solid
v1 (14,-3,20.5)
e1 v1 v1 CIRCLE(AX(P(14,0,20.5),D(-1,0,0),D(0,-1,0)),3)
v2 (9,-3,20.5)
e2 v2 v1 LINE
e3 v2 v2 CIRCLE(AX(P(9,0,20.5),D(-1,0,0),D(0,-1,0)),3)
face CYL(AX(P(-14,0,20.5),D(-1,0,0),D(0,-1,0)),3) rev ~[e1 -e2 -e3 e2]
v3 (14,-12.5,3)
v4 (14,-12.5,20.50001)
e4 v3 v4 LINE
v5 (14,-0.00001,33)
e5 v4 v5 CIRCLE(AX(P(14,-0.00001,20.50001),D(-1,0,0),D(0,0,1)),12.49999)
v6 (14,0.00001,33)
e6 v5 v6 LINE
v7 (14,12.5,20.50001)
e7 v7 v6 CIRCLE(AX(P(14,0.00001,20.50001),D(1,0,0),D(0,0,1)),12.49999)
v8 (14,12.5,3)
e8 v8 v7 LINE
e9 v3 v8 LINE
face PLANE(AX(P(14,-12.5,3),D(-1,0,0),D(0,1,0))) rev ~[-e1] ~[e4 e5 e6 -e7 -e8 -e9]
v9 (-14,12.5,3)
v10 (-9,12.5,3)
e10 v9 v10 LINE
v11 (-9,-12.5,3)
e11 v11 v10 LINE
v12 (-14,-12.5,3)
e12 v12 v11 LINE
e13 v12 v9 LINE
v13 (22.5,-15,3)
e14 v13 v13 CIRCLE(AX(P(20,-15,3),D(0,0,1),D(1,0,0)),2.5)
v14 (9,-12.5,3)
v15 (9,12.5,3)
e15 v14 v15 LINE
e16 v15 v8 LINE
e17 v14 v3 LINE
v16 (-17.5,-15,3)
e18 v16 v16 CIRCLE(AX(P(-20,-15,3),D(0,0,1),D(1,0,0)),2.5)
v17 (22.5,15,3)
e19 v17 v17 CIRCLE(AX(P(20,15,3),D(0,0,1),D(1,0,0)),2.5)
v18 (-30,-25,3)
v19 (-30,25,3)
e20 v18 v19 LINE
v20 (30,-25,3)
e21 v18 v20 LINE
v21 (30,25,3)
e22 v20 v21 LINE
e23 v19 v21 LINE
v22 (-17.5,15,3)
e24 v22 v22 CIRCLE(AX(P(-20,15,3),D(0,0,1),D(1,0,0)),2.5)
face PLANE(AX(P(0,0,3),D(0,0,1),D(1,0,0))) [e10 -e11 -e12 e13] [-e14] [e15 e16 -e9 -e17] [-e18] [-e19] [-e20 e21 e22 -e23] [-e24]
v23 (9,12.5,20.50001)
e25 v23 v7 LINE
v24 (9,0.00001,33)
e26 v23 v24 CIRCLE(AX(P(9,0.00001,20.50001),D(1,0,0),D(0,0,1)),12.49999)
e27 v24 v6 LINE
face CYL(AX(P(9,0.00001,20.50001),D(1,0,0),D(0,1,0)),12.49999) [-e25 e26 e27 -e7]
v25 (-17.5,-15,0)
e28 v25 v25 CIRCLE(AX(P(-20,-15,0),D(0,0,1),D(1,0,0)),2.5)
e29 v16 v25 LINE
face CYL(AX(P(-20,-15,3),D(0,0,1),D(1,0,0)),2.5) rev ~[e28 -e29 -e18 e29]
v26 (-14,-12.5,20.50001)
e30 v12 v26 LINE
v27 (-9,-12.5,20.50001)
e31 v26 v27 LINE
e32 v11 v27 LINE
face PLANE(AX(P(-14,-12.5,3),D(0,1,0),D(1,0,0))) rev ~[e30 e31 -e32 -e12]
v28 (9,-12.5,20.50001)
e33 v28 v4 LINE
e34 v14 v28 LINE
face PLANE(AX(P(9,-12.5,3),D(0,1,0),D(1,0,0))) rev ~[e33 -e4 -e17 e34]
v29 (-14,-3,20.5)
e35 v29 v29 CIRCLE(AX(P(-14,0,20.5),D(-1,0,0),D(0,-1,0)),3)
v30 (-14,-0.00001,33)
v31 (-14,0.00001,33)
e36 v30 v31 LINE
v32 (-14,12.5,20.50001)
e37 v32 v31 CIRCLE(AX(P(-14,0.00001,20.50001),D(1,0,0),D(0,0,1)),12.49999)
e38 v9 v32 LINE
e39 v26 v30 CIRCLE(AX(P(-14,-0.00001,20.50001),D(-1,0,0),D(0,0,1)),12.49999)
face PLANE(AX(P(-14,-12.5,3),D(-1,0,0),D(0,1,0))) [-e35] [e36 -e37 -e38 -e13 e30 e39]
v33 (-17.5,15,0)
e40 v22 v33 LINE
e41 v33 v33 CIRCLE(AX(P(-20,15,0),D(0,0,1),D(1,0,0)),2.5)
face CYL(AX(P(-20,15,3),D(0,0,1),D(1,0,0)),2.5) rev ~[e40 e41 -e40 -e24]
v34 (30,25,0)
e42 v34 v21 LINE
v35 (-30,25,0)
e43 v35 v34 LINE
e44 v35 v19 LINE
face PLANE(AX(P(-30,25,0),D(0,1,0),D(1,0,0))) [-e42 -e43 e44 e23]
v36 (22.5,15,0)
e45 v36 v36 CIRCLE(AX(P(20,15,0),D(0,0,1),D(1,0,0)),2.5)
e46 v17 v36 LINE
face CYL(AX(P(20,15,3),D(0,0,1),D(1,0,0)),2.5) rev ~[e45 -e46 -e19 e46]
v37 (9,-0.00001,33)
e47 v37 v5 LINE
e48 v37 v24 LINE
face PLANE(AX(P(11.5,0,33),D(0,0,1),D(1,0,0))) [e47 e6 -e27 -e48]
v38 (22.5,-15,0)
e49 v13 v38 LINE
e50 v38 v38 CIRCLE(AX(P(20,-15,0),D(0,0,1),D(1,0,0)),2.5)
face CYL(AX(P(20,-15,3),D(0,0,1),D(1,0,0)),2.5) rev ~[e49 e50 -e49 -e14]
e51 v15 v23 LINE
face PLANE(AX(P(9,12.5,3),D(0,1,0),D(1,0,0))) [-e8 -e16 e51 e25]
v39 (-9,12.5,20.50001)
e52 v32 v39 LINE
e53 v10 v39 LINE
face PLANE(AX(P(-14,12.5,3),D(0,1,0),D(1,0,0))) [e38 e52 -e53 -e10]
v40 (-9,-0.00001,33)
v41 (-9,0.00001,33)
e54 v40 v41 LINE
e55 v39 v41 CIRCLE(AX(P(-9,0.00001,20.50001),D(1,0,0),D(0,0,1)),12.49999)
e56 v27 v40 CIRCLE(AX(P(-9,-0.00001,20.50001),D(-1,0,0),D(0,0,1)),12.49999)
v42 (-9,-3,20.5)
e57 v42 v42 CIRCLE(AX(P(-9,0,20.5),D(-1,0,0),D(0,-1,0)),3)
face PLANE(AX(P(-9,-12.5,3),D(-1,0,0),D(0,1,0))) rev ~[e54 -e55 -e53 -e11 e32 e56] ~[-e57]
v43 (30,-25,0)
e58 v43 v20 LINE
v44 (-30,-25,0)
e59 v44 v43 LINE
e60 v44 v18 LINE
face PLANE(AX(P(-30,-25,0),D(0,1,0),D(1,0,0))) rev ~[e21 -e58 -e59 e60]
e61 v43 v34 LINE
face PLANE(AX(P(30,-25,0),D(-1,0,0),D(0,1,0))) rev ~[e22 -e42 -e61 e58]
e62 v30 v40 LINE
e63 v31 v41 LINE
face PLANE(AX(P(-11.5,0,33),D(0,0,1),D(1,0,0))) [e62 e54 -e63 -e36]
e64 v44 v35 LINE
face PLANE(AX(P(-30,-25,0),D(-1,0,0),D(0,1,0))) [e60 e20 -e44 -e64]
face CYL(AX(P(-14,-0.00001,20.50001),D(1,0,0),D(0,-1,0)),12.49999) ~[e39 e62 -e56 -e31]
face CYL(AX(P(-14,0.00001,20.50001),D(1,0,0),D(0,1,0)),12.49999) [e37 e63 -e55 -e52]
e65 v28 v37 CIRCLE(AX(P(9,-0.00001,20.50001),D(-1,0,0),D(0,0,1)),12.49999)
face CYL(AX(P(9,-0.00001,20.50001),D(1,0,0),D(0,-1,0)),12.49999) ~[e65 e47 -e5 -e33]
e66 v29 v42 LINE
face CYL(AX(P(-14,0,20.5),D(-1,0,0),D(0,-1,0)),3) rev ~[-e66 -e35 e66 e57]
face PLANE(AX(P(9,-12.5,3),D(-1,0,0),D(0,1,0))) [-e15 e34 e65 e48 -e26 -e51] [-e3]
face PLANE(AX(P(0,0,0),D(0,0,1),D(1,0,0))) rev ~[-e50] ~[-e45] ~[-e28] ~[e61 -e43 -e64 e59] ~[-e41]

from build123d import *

# Parameters (mm, degrees)
F0_W     = 60
F0_H     = 50
F1_DEPTH = 3
F2_W     = 5
F2_H     = 25
F3_DEPTH = 30
F4_R     = 12.49999
F5_R     = 3
F6_DEPTH = 50
F7_R     = 2.5
F8_DEPTH = 25


# Not quite as in the source:
# - a fillet or chamfer is up to 0.001 mm smaller than in the source, because OpenCascade refuses the exact size


with BuildPart() as f1:
    # F0 (on Top) → F1 (new body)
    with BuildSketch(Plane.XY):
        Rectangle(F0_W, F0_H)
    extrude(amount=F1_DEPTH)

    # F2 (on face) → F3 (join)
    with BuildSketch(Plane.XY.offset(3)):
        with Locations((-11.5, 0)):
            Rectangle(F2_W, F2_H)
        with Locations((11.5, 0)):
            Rectangle(F2_W, F2_H)
    extrude(amount=F3_DEPTH)

    # F4 (radius 12.5 in the source; OpenCascade refuses exactly that, so slightly less here)
    f4_edges = [f1.edges().sort_by_distance(p)[0] for p in [
        (-11.5, -12.5, 33),
        (-11.5, 12.5, 33),
        (11.5, 12.5, 33),
        (11.5, -12.5, 33),
    ]]
    fillet(f4_edges, radius=F4_R)

    # F5 (on face) → F6 (cut)
    with BuildSketch(Plane(origin=(-14, 0, 0), x_dir=(0, -1, 0), z_dir=(-1, 0, 0))):
        with Locations((0, 20.5)):
            Circle(F5_R)
    extrude(amount=-F6_DEPTH, mode=Mode.SUBTRACT)

    # F7 (on face) → F8 (cut)
    with BuildSketch(Plane.XY.offset(3)):
        with Locations((-20, -15)):
            Circle(F7_R)
        with Locations((-20, 15)):
            Circle(F7_R)
        with Locations((20, 15)):
            Circle(F7_R)
        with Locations((20, -15)):
            Circle(F7_R)
    extrude(amount=-F8_DEPTH, mode=Mode.SUBTRACT)


solid = f1.part
